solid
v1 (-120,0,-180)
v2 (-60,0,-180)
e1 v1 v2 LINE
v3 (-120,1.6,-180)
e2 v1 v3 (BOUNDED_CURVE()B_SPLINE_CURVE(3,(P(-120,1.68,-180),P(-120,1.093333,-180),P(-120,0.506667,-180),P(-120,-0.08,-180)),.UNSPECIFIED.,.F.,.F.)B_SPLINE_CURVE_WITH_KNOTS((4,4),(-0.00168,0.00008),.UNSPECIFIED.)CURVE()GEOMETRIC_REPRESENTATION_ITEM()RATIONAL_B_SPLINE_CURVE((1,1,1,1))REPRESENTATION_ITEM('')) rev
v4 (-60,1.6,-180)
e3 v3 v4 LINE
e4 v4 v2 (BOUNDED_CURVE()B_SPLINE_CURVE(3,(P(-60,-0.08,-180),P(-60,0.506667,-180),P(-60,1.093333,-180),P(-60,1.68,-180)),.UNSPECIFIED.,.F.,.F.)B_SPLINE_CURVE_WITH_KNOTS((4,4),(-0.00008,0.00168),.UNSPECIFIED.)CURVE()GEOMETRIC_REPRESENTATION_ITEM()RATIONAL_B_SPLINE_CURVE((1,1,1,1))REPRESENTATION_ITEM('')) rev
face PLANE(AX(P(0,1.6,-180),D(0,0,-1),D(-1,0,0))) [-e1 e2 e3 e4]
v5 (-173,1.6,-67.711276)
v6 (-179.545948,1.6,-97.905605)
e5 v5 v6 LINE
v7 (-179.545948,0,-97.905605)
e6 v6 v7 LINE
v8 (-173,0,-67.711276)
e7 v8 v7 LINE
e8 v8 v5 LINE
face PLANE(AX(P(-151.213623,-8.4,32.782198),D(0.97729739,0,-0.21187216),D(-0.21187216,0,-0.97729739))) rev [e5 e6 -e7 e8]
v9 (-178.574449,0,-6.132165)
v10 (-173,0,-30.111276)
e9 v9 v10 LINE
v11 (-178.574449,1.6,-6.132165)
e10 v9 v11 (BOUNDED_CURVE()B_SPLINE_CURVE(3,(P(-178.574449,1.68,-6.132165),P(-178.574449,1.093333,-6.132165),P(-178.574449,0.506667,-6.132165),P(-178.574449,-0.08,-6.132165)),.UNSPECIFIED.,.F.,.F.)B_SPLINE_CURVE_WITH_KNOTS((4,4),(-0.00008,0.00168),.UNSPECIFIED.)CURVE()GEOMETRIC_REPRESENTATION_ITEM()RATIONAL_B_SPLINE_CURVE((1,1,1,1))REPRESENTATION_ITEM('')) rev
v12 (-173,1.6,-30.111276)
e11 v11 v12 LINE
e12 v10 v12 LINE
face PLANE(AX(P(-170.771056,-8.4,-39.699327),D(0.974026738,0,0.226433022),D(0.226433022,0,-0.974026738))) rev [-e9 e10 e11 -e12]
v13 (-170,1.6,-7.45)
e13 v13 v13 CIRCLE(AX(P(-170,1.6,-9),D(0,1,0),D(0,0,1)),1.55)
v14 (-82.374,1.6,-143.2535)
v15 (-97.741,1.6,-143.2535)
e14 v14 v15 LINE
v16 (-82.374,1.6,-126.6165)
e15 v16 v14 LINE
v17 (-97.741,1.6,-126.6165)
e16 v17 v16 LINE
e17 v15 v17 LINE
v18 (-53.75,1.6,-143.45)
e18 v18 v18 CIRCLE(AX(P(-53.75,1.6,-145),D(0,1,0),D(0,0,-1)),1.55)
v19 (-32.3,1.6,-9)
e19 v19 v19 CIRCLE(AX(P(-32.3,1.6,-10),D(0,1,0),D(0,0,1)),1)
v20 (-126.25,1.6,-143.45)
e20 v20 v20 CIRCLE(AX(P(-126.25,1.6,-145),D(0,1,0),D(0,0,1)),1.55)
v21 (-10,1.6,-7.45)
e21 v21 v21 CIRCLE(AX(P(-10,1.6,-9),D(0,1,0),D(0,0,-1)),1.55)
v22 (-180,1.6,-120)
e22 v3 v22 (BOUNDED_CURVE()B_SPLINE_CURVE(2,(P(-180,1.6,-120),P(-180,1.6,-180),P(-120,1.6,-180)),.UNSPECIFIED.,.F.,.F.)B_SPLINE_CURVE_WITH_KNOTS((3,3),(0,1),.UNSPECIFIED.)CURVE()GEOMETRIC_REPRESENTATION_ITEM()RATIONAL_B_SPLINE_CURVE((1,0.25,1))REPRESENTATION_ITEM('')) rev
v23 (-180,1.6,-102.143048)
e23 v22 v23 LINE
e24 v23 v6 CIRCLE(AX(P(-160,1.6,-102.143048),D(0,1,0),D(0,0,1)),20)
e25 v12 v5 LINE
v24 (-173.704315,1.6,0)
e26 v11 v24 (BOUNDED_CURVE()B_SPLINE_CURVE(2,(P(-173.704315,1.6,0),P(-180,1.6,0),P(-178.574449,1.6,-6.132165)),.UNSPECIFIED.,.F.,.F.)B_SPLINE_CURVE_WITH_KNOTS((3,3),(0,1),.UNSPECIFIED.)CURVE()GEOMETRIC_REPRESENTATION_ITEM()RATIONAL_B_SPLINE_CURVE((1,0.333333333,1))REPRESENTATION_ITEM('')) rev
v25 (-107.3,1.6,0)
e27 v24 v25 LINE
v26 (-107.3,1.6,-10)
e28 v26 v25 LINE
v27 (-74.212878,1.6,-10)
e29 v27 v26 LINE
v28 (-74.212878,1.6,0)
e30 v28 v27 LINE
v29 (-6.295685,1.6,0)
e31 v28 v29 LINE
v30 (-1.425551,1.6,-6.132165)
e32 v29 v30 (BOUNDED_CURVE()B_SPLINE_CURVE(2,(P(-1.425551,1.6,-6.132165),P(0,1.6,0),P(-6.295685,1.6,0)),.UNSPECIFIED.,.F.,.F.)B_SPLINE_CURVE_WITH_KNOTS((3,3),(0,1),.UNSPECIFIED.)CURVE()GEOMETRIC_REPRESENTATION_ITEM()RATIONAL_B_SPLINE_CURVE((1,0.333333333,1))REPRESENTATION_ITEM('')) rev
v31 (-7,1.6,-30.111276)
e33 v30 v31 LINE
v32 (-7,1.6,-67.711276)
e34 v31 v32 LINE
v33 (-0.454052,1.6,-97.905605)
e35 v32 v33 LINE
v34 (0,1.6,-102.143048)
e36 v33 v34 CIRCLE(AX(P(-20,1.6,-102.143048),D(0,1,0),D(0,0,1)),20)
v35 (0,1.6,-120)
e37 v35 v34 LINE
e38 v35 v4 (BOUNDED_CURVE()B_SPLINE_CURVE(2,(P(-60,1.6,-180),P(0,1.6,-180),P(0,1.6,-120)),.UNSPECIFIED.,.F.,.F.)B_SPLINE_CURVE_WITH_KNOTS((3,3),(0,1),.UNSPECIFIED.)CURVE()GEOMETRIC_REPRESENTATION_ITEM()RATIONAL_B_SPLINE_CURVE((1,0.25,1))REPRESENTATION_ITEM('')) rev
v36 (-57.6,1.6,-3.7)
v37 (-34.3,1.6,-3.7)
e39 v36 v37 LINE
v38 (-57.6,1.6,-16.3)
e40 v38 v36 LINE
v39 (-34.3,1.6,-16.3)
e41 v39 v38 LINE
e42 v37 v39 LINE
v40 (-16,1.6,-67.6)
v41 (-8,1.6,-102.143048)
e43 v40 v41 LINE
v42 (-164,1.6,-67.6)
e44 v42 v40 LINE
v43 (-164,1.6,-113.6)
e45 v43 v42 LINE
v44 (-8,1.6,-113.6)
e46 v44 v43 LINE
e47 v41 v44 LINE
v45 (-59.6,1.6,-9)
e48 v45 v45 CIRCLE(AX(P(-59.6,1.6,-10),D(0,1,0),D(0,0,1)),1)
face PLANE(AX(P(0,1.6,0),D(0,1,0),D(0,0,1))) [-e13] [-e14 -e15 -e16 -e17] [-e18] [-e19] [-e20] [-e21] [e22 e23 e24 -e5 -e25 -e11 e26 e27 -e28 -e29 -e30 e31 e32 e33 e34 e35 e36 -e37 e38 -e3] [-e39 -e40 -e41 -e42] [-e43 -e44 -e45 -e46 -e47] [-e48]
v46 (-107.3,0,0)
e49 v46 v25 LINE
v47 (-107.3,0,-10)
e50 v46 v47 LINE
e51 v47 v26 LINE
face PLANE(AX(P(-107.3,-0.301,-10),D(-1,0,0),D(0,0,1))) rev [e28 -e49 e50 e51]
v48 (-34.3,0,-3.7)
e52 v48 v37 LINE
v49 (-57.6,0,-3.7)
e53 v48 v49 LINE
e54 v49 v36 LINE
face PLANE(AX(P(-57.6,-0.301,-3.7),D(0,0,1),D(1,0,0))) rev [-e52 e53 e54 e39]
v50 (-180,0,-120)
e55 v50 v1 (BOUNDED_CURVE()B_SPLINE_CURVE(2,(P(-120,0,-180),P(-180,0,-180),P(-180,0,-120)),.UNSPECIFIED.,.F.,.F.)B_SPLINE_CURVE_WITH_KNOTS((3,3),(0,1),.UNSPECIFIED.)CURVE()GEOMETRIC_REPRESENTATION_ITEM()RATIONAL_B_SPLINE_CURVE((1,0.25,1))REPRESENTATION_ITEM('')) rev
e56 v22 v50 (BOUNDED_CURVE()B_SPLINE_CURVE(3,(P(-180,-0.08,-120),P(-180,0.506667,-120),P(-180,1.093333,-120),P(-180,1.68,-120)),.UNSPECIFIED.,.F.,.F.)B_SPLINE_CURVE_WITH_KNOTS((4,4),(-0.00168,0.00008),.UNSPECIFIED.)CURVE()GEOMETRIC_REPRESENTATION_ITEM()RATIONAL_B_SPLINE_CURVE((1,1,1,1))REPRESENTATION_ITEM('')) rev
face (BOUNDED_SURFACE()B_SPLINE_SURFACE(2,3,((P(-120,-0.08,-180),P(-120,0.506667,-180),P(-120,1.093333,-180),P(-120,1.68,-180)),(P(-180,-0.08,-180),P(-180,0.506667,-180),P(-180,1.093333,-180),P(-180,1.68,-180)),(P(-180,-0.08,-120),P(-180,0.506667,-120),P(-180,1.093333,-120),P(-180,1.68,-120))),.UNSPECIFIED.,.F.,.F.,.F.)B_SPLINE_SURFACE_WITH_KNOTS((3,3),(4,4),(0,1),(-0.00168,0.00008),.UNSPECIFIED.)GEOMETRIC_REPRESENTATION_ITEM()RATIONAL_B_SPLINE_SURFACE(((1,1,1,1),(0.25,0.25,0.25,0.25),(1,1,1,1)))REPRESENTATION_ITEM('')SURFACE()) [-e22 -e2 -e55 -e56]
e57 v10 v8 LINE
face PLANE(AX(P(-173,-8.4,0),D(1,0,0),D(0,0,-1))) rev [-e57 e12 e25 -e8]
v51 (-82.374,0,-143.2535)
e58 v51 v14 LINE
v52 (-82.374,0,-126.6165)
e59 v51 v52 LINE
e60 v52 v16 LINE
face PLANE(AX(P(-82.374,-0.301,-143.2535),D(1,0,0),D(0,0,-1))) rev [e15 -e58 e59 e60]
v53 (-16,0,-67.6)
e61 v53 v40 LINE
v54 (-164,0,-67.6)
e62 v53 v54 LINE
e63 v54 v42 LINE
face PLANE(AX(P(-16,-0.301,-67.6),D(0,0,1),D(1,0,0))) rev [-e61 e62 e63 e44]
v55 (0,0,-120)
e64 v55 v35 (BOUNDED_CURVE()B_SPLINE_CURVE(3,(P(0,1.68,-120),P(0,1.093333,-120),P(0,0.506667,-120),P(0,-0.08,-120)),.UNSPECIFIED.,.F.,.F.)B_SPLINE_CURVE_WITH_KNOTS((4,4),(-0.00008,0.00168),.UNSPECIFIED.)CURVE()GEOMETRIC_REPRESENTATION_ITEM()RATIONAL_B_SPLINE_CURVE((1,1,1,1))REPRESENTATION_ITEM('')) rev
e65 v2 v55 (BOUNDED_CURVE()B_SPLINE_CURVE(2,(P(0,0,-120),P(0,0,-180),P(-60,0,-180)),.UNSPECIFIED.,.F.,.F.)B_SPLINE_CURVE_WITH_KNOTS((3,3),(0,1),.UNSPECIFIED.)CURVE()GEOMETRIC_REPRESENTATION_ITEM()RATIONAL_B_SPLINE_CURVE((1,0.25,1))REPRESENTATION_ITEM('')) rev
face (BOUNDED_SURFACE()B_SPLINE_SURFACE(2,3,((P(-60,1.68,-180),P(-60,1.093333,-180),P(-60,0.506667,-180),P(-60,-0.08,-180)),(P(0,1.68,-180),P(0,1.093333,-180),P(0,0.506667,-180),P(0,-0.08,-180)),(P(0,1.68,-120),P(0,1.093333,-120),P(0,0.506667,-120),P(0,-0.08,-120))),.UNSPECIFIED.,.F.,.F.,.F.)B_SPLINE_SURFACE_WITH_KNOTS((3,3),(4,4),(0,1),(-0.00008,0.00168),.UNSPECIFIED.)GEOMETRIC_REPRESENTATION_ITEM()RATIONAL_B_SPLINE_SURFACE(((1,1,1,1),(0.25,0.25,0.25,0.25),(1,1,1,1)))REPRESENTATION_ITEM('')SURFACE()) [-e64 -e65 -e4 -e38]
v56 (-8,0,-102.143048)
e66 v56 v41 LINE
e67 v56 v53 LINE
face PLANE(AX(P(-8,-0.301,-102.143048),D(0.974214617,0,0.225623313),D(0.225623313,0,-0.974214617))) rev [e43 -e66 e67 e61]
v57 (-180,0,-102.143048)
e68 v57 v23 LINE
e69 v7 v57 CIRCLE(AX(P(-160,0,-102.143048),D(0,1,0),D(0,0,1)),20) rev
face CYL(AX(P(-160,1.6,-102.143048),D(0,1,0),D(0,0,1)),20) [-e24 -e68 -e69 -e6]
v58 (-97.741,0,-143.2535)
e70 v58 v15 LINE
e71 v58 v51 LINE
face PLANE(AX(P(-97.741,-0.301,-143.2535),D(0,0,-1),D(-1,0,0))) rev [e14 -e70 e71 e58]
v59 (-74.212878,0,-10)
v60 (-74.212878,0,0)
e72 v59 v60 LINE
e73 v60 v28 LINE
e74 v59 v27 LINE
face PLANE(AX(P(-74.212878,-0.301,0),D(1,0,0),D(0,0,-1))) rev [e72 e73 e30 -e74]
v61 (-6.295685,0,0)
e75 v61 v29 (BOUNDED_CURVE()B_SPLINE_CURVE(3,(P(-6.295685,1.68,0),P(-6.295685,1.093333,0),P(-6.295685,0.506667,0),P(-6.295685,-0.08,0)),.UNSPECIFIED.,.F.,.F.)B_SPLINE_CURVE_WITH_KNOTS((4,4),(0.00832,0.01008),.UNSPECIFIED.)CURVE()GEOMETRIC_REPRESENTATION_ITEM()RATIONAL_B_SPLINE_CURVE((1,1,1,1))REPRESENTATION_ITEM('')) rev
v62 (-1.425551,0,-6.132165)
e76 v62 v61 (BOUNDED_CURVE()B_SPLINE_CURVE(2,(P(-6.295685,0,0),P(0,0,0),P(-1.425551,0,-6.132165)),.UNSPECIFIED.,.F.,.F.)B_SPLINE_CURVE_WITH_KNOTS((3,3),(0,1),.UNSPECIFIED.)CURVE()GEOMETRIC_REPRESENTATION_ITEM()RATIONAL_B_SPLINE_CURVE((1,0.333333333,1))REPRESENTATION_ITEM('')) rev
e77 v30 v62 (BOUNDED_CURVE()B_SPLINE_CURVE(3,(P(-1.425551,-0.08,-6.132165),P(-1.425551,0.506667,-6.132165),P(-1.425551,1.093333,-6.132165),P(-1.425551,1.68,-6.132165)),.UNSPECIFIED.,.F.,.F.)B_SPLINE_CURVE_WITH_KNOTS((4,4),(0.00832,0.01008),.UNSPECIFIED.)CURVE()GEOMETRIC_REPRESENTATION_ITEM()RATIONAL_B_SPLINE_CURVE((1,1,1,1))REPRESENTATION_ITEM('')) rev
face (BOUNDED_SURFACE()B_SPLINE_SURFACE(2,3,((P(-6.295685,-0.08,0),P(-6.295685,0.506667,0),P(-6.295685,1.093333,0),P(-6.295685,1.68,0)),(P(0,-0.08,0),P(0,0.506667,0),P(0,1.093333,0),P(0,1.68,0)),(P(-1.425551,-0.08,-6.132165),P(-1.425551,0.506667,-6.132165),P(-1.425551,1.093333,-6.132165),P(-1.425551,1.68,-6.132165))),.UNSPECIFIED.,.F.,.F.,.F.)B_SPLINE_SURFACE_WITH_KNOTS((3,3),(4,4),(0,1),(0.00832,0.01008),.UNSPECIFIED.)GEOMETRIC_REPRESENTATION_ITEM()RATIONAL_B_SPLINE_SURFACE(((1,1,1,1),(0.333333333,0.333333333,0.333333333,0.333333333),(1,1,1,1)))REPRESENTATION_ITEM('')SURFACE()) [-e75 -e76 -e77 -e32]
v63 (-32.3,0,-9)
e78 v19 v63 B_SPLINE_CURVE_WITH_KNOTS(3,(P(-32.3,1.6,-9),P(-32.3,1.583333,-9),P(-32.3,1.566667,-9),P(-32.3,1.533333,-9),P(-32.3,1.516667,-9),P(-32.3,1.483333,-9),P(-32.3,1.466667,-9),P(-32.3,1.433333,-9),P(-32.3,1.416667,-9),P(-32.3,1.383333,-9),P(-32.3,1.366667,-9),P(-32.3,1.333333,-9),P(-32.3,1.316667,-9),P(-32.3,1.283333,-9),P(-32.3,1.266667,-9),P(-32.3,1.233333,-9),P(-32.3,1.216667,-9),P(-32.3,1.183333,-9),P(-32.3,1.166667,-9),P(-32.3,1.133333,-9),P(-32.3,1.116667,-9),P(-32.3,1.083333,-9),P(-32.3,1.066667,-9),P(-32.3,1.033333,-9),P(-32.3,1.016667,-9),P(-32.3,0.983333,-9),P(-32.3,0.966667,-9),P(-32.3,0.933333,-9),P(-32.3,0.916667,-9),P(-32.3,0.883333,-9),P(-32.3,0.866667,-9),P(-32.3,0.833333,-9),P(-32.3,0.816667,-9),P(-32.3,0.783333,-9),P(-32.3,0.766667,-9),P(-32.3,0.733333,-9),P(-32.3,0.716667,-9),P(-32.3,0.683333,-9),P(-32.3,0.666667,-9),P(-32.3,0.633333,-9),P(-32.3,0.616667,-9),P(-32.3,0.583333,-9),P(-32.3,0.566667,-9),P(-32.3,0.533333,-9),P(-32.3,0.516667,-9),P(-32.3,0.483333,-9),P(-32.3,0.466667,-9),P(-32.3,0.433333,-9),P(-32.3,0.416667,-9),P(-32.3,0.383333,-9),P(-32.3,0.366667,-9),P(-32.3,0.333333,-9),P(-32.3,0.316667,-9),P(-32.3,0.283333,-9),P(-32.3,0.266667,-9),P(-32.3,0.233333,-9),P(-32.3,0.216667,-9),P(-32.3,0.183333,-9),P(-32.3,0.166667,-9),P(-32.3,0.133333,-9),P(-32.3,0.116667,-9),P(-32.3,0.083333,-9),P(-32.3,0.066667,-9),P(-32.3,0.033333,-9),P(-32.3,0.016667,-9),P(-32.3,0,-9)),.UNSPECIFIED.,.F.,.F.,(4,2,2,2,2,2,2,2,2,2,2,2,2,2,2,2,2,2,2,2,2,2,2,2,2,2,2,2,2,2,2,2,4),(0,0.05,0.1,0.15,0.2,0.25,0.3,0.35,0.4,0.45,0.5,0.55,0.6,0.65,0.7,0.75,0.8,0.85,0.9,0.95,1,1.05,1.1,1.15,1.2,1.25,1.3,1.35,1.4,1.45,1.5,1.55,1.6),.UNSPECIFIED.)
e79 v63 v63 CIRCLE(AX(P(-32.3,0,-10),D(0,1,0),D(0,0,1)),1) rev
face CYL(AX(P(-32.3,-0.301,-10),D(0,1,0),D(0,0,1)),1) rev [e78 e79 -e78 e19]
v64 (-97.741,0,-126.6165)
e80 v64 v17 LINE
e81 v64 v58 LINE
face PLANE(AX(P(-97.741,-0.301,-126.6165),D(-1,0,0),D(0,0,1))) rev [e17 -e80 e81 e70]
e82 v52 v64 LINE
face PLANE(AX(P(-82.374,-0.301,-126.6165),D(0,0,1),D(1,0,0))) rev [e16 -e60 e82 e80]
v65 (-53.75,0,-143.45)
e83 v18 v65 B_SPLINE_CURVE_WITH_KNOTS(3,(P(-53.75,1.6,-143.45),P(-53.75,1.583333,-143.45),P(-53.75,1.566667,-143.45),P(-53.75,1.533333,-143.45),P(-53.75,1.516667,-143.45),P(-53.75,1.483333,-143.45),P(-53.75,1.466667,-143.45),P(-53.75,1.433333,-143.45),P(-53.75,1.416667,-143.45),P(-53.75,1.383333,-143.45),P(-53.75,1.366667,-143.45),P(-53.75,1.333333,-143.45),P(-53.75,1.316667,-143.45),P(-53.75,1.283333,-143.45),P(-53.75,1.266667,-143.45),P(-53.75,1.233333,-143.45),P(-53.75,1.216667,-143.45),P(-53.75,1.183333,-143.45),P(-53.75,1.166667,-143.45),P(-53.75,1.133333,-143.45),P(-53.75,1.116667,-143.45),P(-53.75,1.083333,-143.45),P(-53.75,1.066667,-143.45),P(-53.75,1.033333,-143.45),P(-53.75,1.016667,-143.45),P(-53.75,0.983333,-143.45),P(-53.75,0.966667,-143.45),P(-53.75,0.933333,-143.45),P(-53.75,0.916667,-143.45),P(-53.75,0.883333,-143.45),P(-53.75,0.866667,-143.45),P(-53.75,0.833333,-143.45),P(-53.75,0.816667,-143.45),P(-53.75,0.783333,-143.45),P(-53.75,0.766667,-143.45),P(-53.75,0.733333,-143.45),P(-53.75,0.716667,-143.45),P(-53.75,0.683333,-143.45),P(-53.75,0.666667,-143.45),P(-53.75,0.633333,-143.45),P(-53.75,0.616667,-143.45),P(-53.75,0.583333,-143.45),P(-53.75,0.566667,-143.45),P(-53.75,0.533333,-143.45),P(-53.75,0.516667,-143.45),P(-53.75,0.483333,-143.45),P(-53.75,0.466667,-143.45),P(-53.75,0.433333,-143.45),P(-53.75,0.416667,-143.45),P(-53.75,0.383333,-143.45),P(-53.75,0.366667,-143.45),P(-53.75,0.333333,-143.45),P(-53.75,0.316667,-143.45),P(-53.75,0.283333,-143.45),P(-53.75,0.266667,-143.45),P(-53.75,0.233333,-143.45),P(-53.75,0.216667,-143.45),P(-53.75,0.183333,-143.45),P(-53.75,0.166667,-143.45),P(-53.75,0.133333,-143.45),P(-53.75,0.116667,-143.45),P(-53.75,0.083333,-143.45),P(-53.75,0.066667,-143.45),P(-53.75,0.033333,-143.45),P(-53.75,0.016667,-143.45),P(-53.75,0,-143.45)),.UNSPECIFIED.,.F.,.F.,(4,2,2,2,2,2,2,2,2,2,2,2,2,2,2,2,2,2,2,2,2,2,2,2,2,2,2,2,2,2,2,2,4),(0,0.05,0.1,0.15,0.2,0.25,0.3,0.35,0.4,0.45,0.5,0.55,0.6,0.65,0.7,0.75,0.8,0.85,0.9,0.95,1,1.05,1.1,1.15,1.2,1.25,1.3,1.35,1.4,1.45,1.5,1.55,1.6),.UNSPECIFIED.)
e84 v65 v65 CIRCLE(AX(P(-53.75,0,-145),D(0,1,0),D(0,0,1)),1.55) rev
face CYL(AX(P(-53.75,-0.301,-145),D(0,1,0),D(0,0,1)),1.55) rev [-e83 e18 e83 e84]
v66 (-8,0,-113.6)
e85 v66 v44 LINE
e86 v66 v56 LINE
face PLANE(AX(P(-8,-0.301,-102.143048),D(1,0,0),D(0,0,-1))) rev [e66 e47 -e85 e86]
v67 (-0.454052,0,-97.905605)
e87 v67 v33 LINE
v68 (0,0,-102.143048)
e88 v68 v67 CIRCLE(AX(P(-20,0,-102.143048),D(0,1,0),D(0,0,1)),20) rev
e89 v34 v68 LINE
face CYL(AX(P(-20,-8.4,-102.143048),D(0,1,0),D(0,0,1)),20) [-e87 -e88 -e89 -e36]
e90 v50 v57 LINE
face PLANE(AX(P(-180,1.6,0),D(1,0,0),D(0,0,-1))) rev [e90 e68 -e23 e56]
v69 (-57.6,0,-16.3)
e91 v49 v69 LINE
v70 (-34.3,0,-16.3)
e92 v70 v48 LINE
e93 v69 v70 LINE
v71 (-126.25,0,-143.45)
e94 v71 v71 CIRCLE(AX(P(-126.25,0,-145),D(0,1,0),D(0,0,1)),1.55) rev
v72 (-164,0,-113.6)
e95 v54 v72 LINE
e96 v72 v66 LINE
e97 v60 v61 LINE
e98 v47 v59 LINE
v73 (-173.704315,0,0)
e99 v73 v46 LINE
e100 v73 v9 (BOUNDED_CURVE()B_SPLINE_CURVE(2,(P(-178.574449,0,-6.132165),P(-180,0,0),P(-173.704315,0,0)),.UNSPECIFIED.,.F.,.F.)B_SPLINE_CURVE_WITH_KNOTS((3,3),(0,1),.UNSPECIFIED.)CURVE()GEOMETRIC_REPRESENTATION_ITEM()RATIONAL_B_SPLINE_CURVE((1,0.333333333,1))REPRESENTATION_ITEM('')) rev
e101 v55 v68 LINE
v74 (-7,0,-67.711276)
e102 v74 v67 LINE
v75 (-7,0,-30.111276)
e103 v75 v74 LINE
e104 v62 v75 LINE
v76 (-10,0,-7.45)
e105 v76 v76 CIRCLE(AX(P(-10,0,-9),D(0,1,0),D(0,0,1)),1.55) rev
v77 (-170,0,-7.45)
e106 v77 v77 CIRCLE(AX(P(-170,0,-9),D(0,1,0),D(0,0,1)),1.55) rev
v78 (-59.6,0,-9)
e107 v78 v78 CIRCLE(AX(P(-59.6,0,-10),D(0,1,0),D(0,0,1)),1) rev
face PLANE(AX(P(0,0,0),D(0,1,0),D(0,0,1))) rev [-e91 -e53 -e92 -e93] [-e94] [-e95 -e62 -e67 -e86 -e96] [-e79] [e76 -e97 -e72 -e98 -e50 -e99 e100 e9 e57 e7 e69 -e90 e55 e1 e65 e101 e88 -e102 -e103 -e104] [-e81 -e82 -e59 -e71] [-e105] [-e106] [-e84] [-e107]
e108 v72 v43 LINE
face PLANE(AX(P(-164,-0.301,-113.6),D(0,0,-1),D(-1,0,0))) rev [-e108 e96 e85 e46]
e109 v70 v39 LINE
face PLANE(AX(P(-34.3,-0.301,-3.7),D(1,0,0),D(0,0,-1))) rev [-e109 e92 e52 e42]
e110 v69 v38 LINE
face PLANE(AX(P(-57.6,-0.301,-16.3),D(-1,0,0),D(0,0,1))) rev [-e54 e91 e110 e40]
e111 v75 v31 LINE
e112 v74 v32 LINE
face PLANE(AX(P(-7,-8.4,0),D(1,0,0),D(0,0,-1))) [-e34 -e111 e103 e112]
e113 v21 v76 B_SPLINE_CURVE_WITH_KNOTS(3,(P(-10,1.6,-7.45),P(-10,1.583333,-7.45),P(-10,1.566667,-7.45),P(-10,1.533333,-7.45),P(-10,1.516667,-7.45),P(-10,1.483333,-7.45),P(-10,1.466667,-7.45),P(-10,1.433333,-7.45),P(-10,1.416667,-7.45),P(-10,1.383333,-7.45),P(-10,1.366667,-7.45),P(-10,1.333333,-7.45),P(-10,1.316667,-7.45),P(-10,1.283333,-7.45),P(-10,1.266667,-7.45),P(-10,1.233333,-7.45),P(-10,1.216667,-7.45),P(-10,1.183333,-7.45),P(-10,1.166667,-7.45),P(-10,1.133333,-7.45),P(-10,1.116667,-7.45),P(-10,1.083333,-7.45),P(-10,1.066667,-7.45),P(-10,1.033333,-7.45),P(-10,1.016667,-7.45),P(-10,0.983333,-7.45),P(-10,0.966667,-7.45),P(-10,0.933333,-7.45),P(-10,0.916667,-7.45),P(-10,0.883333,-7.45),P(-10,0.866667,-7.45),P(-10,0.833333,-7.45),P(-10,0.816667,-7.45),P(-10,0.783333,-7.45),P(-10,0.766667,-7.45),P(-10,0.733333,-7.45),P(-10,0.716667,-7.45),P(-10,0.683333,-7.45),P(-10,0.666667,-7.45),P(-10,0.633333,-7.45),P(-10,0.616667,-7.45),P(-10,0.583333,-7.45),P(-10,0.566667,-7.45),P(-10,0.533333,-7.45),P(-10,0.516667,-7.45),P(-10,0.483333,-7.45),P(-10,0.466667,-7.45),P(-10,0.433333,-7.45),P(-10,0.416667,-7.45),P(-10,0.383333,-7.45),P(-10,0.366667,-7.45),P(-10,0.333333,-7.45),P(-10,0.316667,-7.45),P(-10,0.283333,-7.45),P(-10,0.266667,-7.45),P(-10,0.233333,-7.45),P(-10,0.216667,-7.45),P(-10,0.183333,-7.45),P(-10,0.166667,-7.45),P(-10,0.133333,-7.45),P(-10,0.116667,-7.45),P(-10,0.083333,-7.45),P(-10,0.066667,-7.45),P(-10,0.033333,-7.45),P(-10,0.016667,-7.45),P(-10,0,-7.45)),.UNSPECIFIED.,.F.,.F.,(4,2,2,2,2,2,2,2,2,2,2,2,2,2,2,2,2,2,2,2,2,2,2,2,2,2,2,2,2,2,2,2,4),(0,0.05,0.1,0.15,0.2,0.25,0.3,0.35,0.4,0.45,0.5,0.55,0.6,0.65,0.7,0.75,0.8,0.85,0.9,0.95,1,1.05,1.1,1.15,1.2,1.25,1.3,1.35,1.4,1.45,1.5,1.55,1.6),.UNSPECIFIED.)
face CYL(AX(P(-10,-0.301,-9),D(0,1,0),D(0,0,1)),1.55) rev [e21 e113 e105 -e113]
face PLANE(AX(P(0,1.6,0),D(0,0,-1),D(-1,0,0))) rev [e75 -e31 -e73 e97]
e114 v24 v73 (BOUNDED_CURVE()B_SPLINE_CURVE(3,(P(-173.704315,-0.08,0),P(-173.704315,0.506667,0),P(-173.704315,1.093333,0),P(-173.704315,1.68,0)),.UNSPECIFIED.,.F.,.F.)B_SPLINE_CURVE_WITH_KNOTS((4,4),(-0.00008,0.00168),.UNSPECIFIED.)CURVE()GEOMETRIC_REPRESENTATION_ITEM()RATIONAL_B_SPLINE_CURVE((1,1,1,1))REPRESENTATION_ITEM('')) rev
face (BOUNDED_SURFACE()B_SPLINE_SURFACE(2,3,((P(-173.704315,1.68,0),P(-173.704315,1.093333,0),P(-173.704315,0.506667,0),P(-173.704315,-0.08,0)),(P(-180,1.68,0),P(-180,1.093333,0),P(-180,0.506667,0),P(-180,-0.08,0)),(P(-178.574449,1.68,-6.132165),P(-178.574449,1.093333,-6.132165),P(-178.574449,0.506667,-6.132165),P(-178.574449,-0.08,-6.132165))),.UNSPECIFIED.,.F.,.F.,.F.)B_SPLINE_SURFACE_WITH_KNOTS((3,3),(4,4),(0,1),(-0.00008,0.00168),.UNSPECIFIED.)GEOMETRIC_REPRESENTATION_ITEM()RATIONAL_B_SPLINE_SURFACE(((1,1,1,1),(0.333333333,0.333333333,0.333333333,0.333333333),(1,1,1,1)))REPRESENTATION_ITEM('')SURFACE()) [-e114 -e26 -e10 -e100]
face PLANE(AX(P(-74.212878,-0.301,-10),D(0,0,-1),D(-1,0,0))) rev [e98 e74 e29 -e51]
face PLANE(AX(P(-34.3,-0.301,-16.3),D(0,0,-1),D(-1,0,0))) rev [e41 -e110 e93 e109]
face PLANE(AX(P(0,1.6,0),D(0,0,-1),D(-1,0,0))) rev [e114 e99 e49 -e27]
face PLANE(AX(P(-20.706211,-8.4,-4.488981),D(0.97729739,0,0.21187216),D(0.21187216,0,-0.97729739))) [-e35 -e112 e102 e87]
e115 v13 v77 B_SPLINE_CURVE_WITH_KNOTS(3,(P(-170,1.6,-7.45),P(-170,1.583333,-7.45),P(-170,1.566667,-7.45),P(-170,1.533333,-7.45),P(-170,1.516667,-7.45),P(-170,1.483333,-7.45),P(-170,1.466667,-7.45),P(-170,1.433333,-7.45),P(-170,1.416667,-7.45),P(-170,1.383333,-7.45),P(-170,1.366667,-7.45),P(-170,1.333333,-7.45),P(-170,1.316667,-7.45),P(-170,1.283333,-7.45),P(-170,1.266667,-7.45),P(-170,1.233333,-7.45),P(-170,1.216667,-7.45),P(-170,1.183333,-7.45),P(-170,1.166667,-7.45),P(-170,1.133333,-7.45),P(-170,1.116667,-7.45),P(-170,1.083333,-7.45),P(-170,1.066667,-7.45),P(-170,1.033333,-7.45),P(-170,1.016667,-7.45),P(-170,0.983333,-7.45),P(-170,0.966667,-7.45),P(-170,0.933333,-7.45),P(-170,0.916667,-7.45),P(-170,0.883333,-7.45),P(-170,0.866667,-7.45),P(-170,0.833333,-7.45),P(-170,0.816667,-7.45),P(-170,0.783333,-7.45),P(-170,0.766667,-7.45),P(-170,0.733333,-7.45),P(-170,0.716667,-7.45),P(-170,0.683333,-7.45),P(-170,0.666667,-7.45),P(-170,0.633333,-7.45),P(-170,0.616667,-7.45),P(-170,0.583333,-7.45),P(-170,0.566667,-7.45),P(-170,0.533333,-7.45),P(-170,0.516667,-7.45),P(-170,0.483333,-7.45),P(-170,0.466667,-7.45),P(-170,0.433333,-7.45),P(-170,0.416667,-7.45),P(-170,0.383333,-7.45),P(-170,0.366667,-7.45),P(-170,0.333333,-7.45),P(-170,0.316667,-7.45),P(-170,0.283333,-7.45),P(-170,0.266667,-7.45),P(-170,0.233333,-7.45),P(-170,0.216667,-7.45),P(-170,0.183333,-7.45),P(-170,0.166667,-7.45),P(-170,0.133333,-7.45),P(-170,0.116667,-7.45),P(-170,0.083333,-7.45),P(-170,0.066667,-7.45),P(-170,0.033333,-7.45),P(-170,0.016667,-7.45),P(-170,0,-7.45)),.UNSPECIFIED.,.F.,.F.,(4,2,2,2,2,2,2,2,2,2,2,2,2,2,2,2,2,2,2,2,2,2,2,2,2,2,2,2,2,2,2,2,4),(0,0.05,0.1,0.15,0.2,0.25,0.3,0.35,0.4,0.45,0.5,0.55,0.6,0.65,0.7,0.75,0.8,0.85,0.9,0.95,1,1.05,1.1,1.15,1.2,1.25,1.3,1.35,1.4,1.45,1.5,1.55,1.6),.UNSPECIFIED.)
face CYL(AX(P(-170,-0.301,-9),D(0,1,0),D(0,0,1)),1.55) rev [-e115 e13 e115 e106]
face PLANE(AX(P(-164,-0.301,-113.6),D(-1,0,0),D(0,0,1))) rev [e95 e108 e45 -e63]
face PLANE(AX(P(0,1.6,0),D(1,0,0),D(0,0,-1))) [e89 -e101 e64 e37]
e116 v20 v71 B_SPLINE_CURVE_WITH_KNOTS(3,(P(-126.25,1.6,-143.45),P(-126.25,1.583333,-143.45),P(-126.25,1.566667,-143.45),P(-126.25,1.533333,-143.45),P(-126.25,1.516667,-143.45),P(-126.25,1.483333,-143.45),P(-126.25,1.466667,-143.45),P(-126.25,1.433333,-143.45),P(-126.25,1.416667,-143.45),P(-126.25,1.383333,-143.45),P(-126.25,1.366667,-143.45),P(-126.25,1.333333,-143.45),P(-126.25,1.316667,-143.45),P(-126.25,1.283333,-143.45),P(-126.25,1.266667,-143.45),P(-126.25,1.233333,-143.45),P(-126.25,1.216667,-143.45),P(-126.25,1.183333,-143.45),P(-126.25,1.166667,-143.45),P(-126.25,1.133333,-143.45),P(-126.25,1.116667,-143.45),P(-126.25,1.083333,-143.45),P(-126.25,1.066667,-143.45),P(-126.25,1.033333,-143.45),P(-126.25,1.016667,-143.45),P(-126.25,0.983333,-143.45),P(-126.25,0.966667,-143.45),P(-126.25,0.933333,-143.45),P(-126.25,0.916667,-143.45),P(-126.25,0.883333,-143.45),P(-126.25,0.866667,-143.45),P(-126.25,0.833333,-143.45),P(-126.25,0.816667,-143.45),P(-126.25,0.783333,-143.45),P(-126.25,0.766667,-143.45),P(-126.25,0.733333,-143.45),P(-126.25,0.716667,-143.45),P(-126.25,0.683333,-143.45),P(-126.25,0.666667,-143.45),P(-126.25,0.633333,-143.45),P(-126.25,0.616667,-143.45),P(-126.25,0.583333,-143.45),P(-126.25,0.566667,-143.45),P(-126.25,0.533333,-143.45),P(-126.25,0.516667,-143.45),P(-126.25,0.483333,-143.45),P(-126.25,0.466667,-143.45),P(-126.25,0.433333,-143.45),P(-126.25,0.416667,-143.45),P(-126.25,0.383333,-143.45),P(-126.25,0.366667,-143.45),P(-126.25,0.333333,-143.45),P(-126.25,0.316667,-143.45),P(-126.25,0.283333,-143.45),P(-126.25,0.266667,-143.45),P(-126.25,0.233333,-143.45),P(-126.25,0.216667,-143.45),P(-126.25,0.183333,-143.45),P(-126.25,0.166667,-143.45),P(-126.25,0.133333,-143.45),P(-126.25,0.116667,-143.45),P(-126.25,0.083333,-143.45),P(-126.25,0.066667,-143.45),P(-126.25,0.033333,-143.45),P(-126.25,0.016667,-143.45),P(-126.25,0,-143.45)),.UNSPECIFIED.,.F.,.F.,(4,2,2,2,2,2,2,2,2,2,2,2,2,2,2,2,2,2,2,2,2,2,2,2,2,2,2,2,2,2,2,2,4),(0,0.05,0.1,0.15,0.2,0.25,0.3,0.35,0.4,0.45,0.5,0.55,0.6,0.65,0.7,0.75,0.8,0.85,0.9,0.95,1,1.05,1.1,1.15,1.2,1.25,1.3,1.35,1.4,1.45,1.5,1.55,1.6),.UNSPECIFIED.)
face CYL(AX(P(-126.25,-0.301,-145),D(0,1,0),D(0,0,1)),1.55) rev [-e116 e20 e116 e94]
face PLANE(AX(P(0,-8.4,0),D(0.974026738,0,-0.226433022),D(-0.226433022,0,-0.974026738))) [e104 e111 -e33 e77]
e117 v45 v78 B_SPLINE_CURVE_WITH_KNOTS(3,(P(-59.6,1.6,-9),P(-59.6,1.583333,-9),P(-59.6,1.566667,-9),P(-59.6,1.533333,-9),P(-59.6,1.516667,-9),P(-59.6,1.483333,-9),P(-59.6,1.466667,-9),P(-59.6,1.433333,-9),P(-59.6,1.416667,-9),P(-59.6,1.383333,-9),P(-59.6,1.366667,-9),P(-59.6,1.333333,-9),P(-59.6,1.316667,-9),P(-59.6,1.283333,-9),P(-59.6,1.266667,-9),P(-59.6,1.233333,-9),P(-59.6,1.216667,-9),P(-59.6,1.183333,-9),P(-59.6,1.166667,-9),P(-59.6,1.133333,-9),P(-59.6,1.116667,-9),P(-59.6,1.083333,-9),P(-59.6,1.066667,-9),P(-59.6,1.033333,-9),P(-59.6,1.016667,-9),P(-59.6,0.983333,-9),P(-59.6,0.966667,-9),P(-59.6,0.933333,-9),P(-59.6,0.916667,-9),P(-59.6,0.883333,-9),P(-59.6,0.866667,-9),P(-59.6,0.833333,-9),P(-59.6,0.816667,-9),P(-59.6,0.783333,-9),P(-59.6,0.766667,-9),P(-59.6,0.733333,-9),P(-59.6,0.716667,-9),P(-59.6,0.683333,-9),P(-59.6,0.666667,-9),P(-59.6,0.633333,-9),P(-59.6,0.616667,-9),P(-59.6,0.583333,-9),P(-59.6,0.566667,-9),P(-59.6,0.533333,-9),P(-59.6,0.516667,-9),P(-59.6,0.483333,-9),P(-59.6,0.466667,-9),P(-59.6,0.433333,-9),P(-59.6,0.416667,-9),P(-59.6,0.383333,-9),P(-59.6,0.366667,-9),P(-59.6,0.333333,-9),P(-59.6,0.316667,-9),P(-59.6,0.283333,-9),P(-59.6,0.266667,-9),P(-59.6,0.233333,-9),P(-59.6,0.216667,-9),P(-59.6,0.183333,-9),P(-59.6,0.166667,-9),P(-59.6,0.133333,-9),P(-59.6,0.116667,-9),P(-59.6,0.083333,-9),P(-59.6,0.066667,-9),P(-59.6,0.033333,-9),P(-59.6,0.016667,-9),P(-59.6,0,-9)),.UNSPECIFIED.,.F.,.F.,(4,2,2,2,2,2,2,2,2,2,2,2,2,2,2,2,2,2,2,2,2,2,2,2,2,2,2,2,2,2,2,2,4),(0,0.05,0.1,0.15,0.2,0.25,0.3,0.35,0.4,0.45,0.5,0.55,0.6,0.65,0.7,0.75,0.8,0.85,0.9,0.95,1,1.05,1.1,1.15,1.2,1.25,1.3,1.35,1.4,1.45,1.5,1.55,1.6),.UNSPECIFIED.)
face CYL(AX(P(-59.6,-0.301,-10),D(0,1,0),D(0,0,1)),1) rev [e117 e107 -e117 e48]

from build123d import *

# Parameters (mm, degrees)
SKETCH1_W           = 80
SKETCH1_H           = 30
SKETCH1_W_2         = 50
BOSS_EXTRUDE1_DEPTH = 1.6
FILLET1_SIZE        = 60
SKETCH6_W           = 80
SKETCH6_H           = 30
CUT_EXTRUDE1_DEPTH  = 10
FILLET3_R           = 20
CUT_EXTRUDE3_REACH  = 256.563
SKETCH9_W           = 15.367
SKETCH9_H           = 16.637
CUT_EXTRUDE5_REACH  = 256.563
SKETCH11_R          = 1.55
SKETCH11_R_2        = 1
SKETCH11_W          = 23.3
SKETCH11_H          = 12.6
CUT_EXTRUDE6_REACH  = 256.563
SKETCH12_W          = 33.087121525
SKETCH12_H          = 10


with BuildPart() as part:
    # Sketch1 → Boss-Extrude1 (new body)
    with BuildSketch(Plane(origin=(0, 0, 0), x_dir=(1, 0, 0), z_dir=(0, 1, 0))):
        with Locations((-90, -15)):
            Rectangle(SKETCH1_W, SKETCH1_H)
        Polygon((0, 180), (-180, 180), (-180, 30), (-130, 30), (-50, 30), (0, 30), align=None)
        with Locations((-25, 15)):
            Rectangle(SKETCH1_W_2, SKETCH1_H)
        with Locations((-155, 15)):
            Rectangle(SKETCH1_W_2, SKETCH1_H)
        with Locations((-90, 15)):
            Rectangle(SKETCH1_W, SKETCH1_H)
    extrude(amount=BOSS_EXTRUDE1_DEPTH)

    # Fillet1
    # a fillet whose section is not a circle: 60 mm, written as the material it takes off along each edge
    with BuildSketch(Plane(origin=(0, -150, -180), x_dir=(0, 0, 1), z_dir=(0, 1, 0)), Plane(origin=(-180, -150, -180), x_dir=(1, 0, 0), z_dir=(0, 1, 0))) as fillet1_piece_1:
        with BuildLine():
            Bezier((FILLET1_SIZE, 0), (0, 0), (0, -FILLET1_SIZE), weights=[1, 0.25, 1])
            Line((0, -FILLET1_SIZE), (0, 0))
            Line((0, 0), (FILLET1_SIZE, 0))
        make_face()
    extrude(amount=301.6, mode=Mode.SUBTRACT)

    # Sketch6 → Cut-Extrude1 (cut)
    with BuildSketch(Plane(origin=(0, 1.6, 0), x_dir=(1, 0, 0), z_dir=(0, 1, 0))):
        with Locations((-90, -15)):
            Rectangle(SKETCH6_W, SKETCH6_H)
        Polygon((-180, 100), (-180, 0), (-173, 30.1112758), (-173, 67.7112758), align=None)
        Polygon((-7, 30.1112758), (0, 0), (0, 100), (-7, 67.7112758), align=None)
    extrude(amount=-CUT_EXTRUDE1_DEPTH, mode=Mode.SUBTRACT)

    # Fillet2
    # a fillet whose section is not a circle: 5 mm, written as the material it takes off along each edge
    with BuildSketch(Plane(origin=(-180, -15.739211431, 0), x_dir=(1, 0, 0), z_dir=(0, 1, 0)), Plane(origin=(0, -15.739211431, 0), x_dir=(-0.22643302171939195, 0, -0.9740267381725335), z_dir=(0, 1, 0))) as fillet2_piece_1:
        with BuildLine():
            Bezier((6.295684572, 0), (0, 0), (1.425550882, 6.132165109), weights=[1, 0.333333333, 1])
            Line((1.425550882, 6.132165109), (0, 0))
            Line((0, 0), (6.295684572, 0))
        make_face()
    extrude(amount=33.078422862, mode=Mode.SUBTRACT)

    # Fillet3
    fillet3_edges = [part.edges().sort_by_distance(p)[0] for p in [
        (0, 0.8, -100),
        (-180, 0.8, -100),
    ]]
    fillet(fillet3_edges, radius=FILLET3_R)

    # Sketch9 → Cut-Extrude3 (cut, up to next)
    with BuildSketch(Plane(origin=(0, 1.6, 0), x_dir=(1, 0, 0), z_dir=(0, 1, 0)), mode=Mode.PRIVATE) as cut_extrude3_sk1:
        Polygon((-164, 113.6), (-164, 67.6), (-16, 67.6), (-8, 102.143047988), (-8, 113.6), align=None)
    cut_extrude3_tool1 = extrude(cut_extrude3_sk1.sketch, amount=-CUT_EXTRUDE3_REACH, mode=Mode.PRIVATE) & part.part
    # Sketch9 → Cut-Extrude3 (cut, up to next)
    with BuildSketch(Plane(origin=(0, 1.6, 0), x_dir=(1, 0, 0), z_dir=(0, 1, 0)), mode=Mode.PRIVATE) as cut_extrude3_sk2:
        with Locations((-90.0575, 134.935)):
            Rectangle(SKETCH9_W, SKETCH9_H)
    cut_extrude3_tool2 = extrude(cut_extrude3_sk2.sketch, amount=-CUT_EXTRUDE3_REACH, mode=Mode.PRIVATE) & part.part
    add(cut_extrude3_tool1.solids().sort_by_distance((-87.479003, 1.6, -90.825495))[0], mode=Mode.SUBTRACT)
    add(cut_extrude3_tool2.solids().sort_by_distance((-90.0575, 1.6, -134.935))[0], mode=Mode.SUBTRACT)

    # Sketch11 → Cut-Extrude5 (cut, up to next)
    with BuildSketch(Plane(origin=(0, 1.6, 0), x_dir=(1, 0, 0), z_dir=(0, 1, 0)), mode=Mode.PRIVATE) as cut_extrude5_sk1:
        with Locations(Location((-170, 9, 0), (0, 0, 270))):
            Circle(SKETCH11_R)
    cut_extrude5_tool1 = extrude(cut_extrude5_sk1.sketch, amount=-CUT_EXTRUDE5_REACH, mode=Mode.PRIVATE) & part.part
    # Sketch11 → Cut-Extrude5 (cut, up to next)
    with BuildSketch(Plane(origin=(0, 1.6, 0), x_dir=(1, 0, 0), z_dir=(0, 1, 0)), mode=Mode.PRIVATE) as cut_extrude5_sk2:
        with Locations(Location((-126.25, 145, 0), (0, 0, 270))):
            Circle(SKETCH11_R)
    cut_extrude5_tool2 = extrude(cut_extrude5_sk2.sketch, amount=-CUT_EXTRUDE5_REACH, mode=Mode.PRIVATE) & part.part
    # Sketch11 → Cut-Extrude5 (cut, up to next)
    with BuildSketch(Plane(origin=(0, 1.6, 0), x_dir=(1, 0, 0), z_dir=(0, 1, 0)), mode=Mode.PRIVATE) as cut_extrude5_sk3:
        with Locations(Location((-10, 9, 0), (0, 0, 270))):
            Circle(SKETCH11_R)
    cut_extrude5_tool3 = extrude(cut_extrude5_sk3.sketch, amount=-CUT_EXTRUDE5_REACH, mode=Mode.PRIVATE) & part.part
    # Sketch11 → Cut-Extrude5 (cut, up to next)
    with BuildSketch(Plane(origin=(0, 1.6, 0), x_dir=(1, 0, 0), z_dir=(0, 1, 0)), mode=Mode.PRIVATE) as cut_extrude5_sk4:
        with Locations(Location((-53.75, 145, 0), (0, 0, 270))):
            Circle(SKETCH11_R)
    cut_extrude5_tool4 = extrude(cut_extrude5_sk4.sketch, amount=-CUT_EXTRUDE5_REACH, mode=Mode.PRIVATE) & part.part
    # Sketch11 → Cut-Extrude5 (cut, up to next)
    with BuildSketch(Plane(origin=(0, 1.6, 0), x_dir=(1, 0, 0), z_dir=(0, 1, 0)), mode=Mode.PRIVATE) as cut_extrude5_sk5:
        with Locations(Location((-32.3, 10, 0), (0, 0, 270))):
            Circle(SKETCH11_R_2)
    cut_extrude5_tool5 = extrude(cut_extrude5_sk5.sketch, amount=-CUT_EXTRUDE5_REACH, mode=Mode.PRIVATE) & part.part
    # Sketch11 → Cut-Extrude5 (cut, up to next)
    with BuildSketch(Plane(origin=(0, 1.6, 0), x_dir=(1, 0, 0), z_dir=(0, 1, 0)), mode=Mode.PRIVATE) as cut_extrude5_sk6:
        with Locations(Location((-59.6, 10, 0), (0, 0, 270))):
            Circle(SKETCH11_R_2)
    cut_extrude5_tool6 = extrude(cut_extrude5_sk6.sketch, amount=-CUT_EXTRUDE5_REACH, mode=Mode.PRIVATE) & part.part
    # Sketch11 → Cut-Extrude5 (cut, up to next)
    with BuildSketch(Plane(origin=(0, 1.6, 0), x_dir=(1, 0, 0), z_dir=(0, 1, 0)), mode=Mode.PRIVATE) as cut_extrude5_sk7:
        with Locations((-45.95, 10)):
            Rectangle(SKETCH11_W, SKETCH11_H)
    cut_extrude5_tool7 = extrude(cut_extrude5_sk7.sketch, amount=-CUT_EXTRUDE5_REACH, mode=Mode.PRIVATE) & part.part
    add(cut_extrude5_tool1.solids().sort_by_distance((-170, 1.6, -9))[0], mode=Mode.SUBTRACT)
    add(cut_extrude5_tool2.solids().sort_by_distance((-126.25, 1.6, -145))[0], mode=Mode.SUBTRACT)
    add(cut_extrude5_tool3.solids().sort_by_distance((-10, 1.6, -9))[0], mode=Mode.SUBTRACT)
    add(cut_extrude5_tool4.solids().sort_by_distance((-53.75, 1.6, -145))[0], mode=Mode.SUBTRACT)
    add(cut_extrude5_tool5.solids().sort_by_distance((-32.3, 1.6, -10))[0], mode=Mode.SUBTRACT)
    add(cut_extrude5_tool6.solids().sort_by_distance((-59.6, 1.6, -10))[0], mode=Mode.SUBTRACT)
    add(cut_extrude5_tool7.solids().sort_by_distance((-45.95, 1.6, -10))[0], mode=Mode.SUBTRACT)

    # Sketch12 → Cut-Extrude6 (cut, up to next)
    with BuildSketch(Plane(origin=(0, 1.6, 0), x_dir=(1, 0, 0), z_dir=(0, 1, 0)), mode=Mode.PRIVATE) as cut_extrude6_sk1:
        with Locations((-90.756439238, 5)):
            Rectangle(SKETCH12_W, SKETCH12_H)
    cut_extrude6_tool1 = extrude(cut_extrude6_sk1.sketch, amount=-CUT_EXTRUDE6_REACH, mode=Mode.PRIVATE) & part.part
    add(cut_extrude6_tool1.solids().sort_by_distance((-90.756439, 1.6, -5))[0], mode=Mode.SUBTRACT)


solid = part.part
